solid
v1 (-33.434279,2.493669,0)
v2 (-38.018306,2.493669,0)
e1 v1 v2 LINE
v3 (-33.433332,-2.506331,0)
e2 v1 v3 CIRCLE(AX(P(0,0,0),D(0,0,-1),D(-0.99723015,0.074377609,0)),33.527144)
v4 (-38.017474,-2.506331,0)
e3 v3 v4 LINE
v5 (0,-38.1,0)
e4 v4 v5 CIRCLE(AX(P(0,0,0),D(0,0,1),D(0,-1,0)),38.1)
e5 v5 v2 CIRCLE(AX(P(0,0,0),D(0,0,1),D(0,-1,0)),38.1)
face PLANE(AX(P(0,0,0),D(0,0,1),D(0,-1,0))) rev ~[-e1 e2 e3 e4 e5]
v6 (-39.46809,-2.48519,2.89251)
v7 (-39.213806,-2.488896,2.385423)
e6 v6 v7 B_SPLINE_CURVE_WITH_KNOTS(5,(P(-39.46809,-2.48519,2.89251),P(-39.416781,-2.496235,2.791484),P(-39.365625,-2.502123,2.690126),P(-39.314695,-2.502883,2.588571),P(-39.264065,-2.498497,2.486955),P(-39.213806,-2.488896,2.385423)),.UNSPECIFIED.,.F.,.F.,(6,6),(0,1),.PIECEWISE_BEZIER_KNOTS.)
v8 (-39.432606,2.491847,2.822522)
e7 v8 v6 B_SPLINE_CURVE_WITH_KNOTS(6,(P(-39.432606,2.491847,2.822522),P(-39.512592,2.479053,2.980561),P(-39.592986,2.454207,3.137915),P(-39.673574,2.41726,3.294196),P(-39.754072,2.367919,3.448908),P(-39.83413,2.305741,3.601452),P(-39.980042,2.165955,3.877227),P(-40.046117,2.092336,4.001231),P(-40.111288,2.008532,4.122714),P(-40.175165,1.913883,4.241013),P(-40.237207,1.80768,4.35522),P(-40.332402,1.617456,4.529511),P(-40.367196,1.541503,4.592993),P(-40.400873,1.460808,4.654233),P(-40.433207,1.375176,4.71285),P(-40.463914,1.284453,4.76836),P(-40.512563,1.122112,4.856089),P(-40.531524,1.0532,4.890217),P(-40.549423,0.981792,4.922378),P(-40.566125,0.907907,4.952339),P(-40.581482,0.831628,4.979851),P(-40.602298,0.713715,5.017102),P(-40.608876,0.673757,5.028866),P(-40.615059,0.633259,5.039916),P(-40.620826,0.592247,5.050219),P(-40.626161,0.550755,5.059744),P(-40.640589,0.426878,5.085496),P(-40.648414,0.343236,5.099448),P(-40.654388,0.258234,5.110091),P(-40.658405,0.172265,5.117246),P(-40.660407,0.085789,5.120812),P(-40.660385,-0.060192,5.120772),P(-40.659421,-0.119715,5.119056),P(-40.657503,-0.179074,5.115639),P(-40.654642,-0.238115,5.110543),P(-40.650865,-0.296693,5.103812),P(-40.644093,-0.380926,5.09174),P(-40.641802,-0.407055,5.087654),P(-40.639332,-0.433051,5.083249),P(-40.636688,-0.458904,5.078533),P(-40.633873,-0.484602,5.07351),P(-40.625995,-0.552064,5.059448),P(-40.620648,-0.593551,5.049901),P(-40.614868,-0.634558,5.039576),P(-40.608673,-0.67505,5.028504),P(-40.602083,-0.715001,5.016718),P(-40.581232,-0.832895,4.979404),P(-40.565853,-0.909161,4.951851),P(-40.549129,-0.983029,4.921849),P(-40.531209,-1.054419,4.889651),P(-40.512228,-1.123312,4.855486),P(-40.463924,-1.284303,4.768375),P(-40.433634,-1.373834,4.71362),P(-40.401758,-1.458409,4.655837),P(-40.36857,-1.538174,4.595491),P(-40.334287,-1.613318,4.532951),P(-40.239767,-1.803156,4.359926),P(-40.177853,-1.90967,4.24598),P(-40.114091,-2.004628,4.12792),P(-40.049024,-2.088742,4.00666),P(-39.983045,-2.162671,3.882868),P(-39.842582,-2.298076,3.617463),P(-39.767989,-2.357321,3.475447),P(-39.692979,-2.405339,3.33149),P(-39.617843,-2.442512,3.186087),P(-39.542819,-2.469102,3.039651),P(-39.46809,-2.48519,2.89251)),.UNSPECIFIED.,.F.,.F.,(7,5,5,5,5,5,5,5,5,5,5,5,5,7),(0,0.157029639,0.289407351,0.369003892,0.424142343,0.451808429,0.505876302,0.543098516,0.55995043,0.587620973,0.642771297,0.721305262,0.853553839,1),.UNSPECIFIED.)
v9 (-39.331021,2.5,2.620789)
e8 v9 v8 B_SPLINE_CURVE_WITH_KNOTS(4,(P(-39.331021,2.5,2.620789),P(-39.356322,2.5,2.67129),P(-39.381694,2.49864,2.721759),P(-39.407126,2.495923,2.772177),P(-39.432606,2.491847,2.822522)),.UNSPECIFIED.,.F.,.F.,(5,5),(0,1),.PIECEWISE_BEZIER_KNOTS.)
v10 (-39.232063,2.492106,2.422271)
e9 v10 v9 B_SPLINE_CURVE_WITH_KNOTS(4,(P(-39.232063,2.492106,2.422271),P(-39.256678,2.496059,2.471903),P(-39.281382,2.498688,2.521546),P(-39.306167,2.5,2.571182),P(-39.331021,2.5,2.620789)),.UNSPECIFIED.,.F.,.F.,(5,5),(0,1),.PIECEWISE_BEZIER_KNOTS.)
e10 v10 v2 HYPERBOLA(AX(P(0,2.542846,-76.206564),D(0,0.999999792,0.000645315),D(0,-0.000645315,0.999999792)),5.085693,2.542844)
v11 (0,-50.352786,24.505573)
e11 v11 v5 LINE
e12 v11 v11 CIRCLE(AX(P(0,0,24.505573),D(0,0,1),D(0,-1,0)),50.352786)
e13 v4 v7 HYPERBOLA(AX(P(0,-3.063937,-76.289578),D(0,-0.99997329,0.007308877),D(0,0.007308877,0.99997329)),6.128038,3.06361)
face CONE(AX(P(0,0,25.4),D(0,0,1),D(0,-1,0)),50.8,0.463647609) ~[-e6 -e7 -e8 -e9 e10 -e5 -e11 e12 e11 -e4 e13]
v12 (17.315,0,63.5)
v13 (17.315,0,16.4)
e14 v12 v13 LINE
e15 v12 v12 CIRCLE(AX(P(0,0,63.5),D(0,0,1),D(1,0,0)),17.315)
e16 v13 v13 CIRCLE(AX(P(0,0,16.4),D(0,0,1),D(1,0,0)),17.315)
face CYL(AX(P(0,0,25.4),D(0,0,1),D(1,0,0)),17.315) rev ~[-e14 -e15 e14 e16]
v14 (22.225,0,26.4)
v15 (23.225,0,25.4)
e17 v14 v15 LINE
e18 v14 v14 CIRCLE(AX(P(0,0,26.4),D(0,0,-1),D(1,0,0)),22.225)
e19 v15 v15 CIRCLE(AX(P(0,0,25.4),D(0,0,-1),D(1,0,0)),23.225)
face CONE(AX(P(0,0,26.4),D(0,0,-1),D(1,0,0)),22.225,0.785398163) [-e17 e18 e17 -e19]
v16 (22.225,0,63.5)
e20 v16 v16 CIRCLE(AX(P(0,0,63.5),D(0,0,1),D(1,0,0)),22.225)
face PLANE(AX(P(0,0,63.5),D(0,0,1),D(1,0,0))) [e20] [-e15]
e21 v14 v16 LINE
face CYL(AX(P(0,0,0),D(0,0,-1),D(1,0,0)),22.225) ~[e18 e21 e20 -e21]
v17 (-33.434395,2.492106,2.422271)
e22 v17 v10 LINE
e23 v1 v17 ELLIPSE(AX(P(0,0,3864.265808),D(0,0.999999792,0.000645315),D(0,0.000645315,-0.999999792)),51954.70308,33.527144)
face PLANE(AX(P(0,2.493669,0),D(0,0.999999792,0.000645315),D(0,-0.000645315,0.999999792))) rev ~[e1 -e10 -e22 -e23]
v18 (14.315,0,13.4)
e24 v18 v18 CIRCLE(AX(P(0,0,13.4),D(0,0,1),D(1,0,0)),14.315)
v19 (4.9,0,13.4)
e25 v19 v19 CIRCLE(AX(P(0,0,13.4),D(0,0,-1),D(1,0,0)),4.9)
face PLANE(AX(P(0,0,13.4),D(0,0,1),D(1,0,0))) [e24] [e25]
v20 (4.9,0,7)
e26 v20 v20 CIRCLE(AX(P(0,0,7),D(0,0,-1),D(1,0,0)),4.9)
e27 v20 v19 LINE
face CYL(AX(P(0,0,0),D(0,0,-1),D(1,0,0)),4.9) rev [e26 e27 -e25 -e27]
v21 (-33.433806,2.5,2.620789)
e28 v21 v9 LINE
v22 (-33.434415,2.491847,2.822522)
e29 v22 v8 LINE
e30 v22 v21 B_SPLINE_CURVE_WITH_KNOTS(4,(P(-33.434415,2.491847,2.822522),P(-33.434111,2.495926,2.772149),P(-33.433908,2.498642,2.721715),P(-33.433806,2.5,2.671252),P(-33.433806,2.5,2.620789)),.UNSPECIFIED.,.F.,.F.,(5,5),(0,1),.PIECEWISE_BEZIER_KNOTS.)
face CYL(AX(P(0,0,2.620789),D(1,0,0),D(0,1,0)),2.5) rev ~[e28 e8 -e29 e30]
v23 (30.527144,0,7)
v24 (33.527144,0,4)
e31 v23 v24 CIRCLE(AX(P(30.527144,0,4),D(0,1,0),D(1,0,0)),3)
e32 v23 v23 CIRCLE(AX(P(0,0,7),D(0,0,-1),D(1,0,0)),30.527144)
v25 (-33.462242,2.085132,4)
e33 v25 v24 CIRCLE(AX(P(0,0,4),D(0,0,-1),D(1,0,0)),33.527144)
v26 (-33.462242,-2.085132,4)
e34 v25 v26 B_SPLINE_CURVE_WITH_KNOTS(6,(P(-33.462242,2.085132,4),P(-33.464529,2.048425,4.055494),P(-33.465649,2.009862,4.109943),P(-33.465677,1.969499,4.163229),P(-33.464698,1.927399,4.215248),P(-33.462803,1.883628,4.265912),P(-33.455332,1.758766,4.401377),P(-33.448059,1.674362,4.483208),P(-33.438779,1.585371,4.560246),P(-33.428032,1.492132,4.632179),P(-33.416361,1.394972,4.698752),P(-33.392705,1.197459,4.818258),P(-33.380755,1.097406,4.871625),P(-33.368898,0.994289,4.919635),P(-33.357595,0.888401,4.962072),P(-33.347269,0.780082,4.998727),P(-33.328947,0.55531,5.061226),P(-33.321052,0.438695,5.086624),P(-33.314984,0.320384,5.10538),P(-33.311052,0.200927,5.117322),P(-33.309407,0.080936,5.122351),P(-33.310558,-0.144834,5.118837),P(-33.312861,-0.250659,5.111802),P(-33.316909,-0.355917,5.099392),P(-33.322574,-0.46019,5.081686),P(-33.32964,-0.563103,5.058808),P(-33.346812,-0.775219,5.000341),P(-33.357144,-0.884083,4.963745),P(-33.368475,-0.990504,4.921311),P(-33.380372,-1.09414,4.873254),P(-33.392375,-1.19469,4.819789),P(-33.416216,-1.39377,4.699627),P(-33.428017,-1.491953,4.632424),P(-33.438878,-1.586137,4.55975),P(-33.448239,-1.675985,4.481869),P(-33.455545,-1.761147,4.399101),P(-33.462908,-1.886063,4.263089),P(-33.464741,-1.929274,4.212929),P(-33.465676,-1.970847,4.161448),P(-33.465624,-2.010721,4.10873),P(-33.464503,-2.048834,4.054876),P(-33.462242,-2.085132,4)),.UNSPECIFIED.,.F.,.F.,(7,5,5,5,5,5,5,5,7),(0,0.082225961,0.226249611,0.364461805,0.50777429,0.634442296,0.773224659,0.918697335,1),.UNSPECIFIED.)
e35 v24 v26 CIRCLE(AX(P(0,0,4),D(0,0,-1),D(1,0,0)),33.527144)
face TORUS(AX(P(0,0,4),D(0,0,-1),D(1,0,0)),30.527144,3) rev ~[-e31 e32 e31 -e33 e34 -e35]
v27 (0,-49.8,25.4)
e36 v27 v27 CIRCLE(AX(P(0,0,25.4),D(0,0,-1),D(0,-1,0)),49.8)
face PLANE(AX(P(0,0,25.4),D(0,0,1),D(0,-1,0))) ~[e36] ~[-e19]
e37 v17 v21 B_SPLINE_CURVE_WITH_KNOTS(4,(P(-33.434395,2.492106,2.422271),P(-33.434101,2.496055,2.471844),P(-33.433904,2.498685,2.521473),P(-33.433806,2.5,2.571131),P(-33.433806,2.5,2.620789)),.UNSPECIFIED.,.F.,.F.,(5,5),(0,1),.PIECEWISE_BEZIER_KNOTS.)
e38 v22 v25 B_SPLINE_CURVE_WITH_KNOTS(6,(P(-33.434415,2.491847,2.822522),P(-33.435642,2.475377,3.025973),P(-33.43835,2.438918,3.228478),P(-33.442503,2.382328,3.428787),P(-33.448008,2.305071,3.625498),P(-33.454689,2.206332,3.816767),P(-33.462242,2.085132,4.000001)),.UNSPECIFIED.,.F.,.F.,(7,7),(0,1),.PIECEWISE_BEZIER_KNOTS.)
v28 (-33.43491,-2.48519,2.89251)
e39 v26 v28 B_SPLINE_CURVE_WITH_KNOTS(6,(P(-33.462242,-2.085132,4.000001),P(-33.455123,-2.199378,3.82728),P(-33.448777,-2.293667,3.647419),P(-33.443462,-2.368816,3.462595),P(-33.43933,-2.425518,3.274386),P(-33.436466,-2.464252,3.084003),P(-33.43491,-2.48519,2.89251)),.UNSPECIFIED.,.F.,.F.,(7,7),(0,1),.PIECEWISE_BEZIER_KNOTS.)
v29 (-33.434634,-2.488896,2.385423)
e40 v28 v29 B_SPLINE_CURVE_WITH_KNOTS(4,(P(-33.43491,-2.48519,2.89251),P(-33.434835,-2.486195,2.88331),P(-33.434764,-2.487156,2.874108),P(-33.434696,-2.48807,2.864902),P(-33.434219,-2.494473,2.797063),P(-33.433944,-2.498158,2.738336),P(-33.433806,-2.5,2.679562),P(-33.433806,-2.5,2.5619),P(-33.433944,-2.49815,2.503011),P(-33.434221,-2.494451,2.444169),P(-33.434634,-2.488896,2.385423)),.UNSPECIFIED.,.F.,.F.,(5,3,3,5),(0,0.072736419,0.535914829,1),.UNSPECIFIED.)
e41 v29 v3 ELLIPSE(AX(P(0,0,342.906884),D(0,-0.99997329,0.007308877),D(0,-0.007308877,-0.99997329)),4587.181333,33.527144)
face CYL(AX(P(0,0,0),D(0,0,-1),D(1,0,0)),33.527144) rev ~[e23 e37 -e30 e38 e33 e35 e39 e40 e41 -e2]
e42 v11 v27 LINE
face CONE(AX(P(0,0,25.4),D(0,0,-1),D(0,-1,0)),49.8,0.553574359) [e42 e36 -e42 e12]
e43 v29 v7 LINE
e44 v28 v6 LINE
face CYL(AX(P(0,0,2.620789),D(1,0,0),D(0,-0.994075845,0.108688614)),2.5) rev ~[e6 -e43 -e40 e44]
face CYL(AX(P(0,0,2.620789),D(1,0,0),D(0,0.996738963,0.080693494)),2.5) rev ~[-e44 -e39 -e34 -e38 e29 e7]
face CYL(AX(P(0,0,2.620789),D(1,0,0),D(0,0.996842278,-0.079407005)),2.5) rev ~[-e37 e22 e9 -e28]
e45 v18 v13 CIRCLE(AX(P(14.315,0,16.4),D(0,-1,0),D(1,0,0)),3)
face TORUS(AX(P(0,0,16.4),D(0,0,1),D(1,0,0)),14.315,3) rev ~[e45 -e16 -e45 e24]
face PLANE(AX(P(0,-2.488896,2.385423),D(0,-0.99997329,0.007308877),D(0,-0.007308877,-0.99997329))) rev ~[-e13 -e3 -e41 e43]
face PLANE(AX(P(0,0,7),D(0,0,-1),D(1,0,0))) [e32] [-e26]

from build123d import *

# Parameters (mm, degrees)
F0_R          = 22.225
F0_R_2        = 17.315
F1_DEPTH      = 63.5
F4_SIZE       = 1
F5_R          = 4.9
F3_FACE_R     = 49.8
F3_FACE_R_2   = 22.225
F6_DEPTH      = 40
F7_DEPTH      = 63.501
F7_DEPTH_BACK = 30
F8_R          = 17.315
F9_DEPTH      = 12
F10_R         = 3
F11_R         = 33.5271440313
F12_DEPTH     = 7
F13_R         = 3
F14_W         = 5
F14_H         = 4.8698585015
F15_DEPTH     = 50.3537864045
F16_SIZE      = 1


# Not quite as in the source:
# - a feature names something its author has since deleted; it is built from what else it names


with BuildPart() as f1:
    # F0 (on Top) → F1 (new body)
    with BuildSketch(Plane.XY):
        Circle(F0_R)
        Circle(F0_R_2, mode=Mode.SUBTRACT)
    extrude(amount=F1_DEPTH)

    # F2 (on Right) → F3 (revolve)
    with BuildSketch(Plane.YZ):
        Polygon((-38.1, 0), (0, 0), (0, 25.4), (-17.315, 25.4), (-50.8, 25.4), align=None)
    revolve(axis=Axis((0, 0, 12.7), (0, 0, 1)))

    # F4
    f4_edges = [f1.edges().sort_by_distance(p)[0] for p in [
        (0, 50.8, 25.4),
    ]]
    chamfer(f4_edges, length=F4_SIZE)

    # F5 (on Top) + F3_face (on face) → F6 (cut)
    with BuildSketch(Plane.XY):
        Circle(F5_R)
    with BuildSketch(Plane.XY.offset(25.4)):
        Circle(F3_FACE_R)
        Circle(F3_FACE_R_2, mode=Mode.SUBTRACT)
    extrude(amount=F6_DEPTH, mode=Mode.SUBTRACT)

    # F5 (on Top) → F7 (cut, two sides)
    with BuildSketch(Plane.XY) as f7_sk:
        Circle(F5_R)
    extrude(amount=F7_DEPTH, mode=Mode.SUBTRACT)
    extrude(f7_sk.sketch, amount=-F7_DEPTH_BACK, mode=Mode.SUBTRACT)

    # F8 (on face) → F9 (cut)
    with BuildSketch(Plane.XY.offset(25.4)):
        Circle(F8_R)
    extrude(amount=-F9_DEPTH, mode=Mode.SUBTRACT)

    # F10
    f10_edges = [f1.edges().sort_by_distance(p)[0] for p in [
        (-17.315, 0, 13.4),
    ]]
    fillet(f10_edges, radius=F10_R)

    # F11 (on face) → F12 (cut)
    with BuildSketch(Plane(origin=(0, 0, 0), x_dir=(1, 0, 0), z_dir=(0, 0, -1))):
        Circle(F11_R)
    extrude(amount=-F12_DEPTH, mode=Mode.SUBTRACT)

    # F13
    f13_edges = [f1.edges().sort_by_distance(p)[0] for p in [
        (-33.527144, 0, 7),
    ]]
    fillet(f13_edges, radius=F13_R)

    # F14 (on Right) → F15 (cut, through all)
    with BuildSketch(Plane.YZ):
        with BuildLine():
            Line((-2.4888959483, 2.3854229395), (-2.5063311768, 0))
            Line((-2.5063311768, 0), (2.4936688232, 0))
            Line((2.4936688232, 0), (2.4921056953, 2.4222710093))
            ThreePointArc((2.4921056953, 2.4222710093), (0.0184938011, 0.120856929), (-2.4888959483, 2.3854229395))
        make_face()
        with Locations((-0.0063311768, -2.4349292507)):
            Rectangle(F14_W, F14_H)
        with BuildLine():
            Line((-2.485189612, 2.8925100588), (-2.4888959483, 2.3854229395))
            ThreePointArc((-2.4888959483, 2.3854229395), (0.0184938011, 0.120856929), (2.4921056953, 2.4222710093))
            Line((2.4921056953, 2.4222710093), (2.4918474071, 2.8225222584))
            ThreePointArc((2.4918474071, 2.8225222584), (0.0351518792, 5.1205413808), (-2.485189612, 2.8925100588))
        make_face()
        with BuildLine():
            ThreePointArc((-2.485189612, 2.8925100588), (-2.4999332245, 2.6390607164), (-2.4888959483, 2.3854229395))
            Line((-2.4888959483, 2.3854229395), (-2.485189612, 2.8925100588))
        make_face()
        with BuildLine():
            Line((2.4918474071, 2.8225222584), (2.4921056953, 2.4222710093))
            ThreePointArc((2.4921056953, 2.4222710093), (2.4980256442, 2.5214513158), (2.5, 2.6207885239))
            ThreePointArc((2.5, 2.6207885239), (2.4979610203, 2.7217377245), (2.4918474071, 2.8225222584))
        make_face()
    extrude(amount=-F15_DEPTH, mode=Mode.SUBTRACT)

    # F16
    f16_edges = [f1.edges().sort_by_distance(p)[0] for p in [
        (-22.225, 0, 25.4),
    ]]
    chamfer(f16_edges, length=F16_SIZE)


solid = f1.part
